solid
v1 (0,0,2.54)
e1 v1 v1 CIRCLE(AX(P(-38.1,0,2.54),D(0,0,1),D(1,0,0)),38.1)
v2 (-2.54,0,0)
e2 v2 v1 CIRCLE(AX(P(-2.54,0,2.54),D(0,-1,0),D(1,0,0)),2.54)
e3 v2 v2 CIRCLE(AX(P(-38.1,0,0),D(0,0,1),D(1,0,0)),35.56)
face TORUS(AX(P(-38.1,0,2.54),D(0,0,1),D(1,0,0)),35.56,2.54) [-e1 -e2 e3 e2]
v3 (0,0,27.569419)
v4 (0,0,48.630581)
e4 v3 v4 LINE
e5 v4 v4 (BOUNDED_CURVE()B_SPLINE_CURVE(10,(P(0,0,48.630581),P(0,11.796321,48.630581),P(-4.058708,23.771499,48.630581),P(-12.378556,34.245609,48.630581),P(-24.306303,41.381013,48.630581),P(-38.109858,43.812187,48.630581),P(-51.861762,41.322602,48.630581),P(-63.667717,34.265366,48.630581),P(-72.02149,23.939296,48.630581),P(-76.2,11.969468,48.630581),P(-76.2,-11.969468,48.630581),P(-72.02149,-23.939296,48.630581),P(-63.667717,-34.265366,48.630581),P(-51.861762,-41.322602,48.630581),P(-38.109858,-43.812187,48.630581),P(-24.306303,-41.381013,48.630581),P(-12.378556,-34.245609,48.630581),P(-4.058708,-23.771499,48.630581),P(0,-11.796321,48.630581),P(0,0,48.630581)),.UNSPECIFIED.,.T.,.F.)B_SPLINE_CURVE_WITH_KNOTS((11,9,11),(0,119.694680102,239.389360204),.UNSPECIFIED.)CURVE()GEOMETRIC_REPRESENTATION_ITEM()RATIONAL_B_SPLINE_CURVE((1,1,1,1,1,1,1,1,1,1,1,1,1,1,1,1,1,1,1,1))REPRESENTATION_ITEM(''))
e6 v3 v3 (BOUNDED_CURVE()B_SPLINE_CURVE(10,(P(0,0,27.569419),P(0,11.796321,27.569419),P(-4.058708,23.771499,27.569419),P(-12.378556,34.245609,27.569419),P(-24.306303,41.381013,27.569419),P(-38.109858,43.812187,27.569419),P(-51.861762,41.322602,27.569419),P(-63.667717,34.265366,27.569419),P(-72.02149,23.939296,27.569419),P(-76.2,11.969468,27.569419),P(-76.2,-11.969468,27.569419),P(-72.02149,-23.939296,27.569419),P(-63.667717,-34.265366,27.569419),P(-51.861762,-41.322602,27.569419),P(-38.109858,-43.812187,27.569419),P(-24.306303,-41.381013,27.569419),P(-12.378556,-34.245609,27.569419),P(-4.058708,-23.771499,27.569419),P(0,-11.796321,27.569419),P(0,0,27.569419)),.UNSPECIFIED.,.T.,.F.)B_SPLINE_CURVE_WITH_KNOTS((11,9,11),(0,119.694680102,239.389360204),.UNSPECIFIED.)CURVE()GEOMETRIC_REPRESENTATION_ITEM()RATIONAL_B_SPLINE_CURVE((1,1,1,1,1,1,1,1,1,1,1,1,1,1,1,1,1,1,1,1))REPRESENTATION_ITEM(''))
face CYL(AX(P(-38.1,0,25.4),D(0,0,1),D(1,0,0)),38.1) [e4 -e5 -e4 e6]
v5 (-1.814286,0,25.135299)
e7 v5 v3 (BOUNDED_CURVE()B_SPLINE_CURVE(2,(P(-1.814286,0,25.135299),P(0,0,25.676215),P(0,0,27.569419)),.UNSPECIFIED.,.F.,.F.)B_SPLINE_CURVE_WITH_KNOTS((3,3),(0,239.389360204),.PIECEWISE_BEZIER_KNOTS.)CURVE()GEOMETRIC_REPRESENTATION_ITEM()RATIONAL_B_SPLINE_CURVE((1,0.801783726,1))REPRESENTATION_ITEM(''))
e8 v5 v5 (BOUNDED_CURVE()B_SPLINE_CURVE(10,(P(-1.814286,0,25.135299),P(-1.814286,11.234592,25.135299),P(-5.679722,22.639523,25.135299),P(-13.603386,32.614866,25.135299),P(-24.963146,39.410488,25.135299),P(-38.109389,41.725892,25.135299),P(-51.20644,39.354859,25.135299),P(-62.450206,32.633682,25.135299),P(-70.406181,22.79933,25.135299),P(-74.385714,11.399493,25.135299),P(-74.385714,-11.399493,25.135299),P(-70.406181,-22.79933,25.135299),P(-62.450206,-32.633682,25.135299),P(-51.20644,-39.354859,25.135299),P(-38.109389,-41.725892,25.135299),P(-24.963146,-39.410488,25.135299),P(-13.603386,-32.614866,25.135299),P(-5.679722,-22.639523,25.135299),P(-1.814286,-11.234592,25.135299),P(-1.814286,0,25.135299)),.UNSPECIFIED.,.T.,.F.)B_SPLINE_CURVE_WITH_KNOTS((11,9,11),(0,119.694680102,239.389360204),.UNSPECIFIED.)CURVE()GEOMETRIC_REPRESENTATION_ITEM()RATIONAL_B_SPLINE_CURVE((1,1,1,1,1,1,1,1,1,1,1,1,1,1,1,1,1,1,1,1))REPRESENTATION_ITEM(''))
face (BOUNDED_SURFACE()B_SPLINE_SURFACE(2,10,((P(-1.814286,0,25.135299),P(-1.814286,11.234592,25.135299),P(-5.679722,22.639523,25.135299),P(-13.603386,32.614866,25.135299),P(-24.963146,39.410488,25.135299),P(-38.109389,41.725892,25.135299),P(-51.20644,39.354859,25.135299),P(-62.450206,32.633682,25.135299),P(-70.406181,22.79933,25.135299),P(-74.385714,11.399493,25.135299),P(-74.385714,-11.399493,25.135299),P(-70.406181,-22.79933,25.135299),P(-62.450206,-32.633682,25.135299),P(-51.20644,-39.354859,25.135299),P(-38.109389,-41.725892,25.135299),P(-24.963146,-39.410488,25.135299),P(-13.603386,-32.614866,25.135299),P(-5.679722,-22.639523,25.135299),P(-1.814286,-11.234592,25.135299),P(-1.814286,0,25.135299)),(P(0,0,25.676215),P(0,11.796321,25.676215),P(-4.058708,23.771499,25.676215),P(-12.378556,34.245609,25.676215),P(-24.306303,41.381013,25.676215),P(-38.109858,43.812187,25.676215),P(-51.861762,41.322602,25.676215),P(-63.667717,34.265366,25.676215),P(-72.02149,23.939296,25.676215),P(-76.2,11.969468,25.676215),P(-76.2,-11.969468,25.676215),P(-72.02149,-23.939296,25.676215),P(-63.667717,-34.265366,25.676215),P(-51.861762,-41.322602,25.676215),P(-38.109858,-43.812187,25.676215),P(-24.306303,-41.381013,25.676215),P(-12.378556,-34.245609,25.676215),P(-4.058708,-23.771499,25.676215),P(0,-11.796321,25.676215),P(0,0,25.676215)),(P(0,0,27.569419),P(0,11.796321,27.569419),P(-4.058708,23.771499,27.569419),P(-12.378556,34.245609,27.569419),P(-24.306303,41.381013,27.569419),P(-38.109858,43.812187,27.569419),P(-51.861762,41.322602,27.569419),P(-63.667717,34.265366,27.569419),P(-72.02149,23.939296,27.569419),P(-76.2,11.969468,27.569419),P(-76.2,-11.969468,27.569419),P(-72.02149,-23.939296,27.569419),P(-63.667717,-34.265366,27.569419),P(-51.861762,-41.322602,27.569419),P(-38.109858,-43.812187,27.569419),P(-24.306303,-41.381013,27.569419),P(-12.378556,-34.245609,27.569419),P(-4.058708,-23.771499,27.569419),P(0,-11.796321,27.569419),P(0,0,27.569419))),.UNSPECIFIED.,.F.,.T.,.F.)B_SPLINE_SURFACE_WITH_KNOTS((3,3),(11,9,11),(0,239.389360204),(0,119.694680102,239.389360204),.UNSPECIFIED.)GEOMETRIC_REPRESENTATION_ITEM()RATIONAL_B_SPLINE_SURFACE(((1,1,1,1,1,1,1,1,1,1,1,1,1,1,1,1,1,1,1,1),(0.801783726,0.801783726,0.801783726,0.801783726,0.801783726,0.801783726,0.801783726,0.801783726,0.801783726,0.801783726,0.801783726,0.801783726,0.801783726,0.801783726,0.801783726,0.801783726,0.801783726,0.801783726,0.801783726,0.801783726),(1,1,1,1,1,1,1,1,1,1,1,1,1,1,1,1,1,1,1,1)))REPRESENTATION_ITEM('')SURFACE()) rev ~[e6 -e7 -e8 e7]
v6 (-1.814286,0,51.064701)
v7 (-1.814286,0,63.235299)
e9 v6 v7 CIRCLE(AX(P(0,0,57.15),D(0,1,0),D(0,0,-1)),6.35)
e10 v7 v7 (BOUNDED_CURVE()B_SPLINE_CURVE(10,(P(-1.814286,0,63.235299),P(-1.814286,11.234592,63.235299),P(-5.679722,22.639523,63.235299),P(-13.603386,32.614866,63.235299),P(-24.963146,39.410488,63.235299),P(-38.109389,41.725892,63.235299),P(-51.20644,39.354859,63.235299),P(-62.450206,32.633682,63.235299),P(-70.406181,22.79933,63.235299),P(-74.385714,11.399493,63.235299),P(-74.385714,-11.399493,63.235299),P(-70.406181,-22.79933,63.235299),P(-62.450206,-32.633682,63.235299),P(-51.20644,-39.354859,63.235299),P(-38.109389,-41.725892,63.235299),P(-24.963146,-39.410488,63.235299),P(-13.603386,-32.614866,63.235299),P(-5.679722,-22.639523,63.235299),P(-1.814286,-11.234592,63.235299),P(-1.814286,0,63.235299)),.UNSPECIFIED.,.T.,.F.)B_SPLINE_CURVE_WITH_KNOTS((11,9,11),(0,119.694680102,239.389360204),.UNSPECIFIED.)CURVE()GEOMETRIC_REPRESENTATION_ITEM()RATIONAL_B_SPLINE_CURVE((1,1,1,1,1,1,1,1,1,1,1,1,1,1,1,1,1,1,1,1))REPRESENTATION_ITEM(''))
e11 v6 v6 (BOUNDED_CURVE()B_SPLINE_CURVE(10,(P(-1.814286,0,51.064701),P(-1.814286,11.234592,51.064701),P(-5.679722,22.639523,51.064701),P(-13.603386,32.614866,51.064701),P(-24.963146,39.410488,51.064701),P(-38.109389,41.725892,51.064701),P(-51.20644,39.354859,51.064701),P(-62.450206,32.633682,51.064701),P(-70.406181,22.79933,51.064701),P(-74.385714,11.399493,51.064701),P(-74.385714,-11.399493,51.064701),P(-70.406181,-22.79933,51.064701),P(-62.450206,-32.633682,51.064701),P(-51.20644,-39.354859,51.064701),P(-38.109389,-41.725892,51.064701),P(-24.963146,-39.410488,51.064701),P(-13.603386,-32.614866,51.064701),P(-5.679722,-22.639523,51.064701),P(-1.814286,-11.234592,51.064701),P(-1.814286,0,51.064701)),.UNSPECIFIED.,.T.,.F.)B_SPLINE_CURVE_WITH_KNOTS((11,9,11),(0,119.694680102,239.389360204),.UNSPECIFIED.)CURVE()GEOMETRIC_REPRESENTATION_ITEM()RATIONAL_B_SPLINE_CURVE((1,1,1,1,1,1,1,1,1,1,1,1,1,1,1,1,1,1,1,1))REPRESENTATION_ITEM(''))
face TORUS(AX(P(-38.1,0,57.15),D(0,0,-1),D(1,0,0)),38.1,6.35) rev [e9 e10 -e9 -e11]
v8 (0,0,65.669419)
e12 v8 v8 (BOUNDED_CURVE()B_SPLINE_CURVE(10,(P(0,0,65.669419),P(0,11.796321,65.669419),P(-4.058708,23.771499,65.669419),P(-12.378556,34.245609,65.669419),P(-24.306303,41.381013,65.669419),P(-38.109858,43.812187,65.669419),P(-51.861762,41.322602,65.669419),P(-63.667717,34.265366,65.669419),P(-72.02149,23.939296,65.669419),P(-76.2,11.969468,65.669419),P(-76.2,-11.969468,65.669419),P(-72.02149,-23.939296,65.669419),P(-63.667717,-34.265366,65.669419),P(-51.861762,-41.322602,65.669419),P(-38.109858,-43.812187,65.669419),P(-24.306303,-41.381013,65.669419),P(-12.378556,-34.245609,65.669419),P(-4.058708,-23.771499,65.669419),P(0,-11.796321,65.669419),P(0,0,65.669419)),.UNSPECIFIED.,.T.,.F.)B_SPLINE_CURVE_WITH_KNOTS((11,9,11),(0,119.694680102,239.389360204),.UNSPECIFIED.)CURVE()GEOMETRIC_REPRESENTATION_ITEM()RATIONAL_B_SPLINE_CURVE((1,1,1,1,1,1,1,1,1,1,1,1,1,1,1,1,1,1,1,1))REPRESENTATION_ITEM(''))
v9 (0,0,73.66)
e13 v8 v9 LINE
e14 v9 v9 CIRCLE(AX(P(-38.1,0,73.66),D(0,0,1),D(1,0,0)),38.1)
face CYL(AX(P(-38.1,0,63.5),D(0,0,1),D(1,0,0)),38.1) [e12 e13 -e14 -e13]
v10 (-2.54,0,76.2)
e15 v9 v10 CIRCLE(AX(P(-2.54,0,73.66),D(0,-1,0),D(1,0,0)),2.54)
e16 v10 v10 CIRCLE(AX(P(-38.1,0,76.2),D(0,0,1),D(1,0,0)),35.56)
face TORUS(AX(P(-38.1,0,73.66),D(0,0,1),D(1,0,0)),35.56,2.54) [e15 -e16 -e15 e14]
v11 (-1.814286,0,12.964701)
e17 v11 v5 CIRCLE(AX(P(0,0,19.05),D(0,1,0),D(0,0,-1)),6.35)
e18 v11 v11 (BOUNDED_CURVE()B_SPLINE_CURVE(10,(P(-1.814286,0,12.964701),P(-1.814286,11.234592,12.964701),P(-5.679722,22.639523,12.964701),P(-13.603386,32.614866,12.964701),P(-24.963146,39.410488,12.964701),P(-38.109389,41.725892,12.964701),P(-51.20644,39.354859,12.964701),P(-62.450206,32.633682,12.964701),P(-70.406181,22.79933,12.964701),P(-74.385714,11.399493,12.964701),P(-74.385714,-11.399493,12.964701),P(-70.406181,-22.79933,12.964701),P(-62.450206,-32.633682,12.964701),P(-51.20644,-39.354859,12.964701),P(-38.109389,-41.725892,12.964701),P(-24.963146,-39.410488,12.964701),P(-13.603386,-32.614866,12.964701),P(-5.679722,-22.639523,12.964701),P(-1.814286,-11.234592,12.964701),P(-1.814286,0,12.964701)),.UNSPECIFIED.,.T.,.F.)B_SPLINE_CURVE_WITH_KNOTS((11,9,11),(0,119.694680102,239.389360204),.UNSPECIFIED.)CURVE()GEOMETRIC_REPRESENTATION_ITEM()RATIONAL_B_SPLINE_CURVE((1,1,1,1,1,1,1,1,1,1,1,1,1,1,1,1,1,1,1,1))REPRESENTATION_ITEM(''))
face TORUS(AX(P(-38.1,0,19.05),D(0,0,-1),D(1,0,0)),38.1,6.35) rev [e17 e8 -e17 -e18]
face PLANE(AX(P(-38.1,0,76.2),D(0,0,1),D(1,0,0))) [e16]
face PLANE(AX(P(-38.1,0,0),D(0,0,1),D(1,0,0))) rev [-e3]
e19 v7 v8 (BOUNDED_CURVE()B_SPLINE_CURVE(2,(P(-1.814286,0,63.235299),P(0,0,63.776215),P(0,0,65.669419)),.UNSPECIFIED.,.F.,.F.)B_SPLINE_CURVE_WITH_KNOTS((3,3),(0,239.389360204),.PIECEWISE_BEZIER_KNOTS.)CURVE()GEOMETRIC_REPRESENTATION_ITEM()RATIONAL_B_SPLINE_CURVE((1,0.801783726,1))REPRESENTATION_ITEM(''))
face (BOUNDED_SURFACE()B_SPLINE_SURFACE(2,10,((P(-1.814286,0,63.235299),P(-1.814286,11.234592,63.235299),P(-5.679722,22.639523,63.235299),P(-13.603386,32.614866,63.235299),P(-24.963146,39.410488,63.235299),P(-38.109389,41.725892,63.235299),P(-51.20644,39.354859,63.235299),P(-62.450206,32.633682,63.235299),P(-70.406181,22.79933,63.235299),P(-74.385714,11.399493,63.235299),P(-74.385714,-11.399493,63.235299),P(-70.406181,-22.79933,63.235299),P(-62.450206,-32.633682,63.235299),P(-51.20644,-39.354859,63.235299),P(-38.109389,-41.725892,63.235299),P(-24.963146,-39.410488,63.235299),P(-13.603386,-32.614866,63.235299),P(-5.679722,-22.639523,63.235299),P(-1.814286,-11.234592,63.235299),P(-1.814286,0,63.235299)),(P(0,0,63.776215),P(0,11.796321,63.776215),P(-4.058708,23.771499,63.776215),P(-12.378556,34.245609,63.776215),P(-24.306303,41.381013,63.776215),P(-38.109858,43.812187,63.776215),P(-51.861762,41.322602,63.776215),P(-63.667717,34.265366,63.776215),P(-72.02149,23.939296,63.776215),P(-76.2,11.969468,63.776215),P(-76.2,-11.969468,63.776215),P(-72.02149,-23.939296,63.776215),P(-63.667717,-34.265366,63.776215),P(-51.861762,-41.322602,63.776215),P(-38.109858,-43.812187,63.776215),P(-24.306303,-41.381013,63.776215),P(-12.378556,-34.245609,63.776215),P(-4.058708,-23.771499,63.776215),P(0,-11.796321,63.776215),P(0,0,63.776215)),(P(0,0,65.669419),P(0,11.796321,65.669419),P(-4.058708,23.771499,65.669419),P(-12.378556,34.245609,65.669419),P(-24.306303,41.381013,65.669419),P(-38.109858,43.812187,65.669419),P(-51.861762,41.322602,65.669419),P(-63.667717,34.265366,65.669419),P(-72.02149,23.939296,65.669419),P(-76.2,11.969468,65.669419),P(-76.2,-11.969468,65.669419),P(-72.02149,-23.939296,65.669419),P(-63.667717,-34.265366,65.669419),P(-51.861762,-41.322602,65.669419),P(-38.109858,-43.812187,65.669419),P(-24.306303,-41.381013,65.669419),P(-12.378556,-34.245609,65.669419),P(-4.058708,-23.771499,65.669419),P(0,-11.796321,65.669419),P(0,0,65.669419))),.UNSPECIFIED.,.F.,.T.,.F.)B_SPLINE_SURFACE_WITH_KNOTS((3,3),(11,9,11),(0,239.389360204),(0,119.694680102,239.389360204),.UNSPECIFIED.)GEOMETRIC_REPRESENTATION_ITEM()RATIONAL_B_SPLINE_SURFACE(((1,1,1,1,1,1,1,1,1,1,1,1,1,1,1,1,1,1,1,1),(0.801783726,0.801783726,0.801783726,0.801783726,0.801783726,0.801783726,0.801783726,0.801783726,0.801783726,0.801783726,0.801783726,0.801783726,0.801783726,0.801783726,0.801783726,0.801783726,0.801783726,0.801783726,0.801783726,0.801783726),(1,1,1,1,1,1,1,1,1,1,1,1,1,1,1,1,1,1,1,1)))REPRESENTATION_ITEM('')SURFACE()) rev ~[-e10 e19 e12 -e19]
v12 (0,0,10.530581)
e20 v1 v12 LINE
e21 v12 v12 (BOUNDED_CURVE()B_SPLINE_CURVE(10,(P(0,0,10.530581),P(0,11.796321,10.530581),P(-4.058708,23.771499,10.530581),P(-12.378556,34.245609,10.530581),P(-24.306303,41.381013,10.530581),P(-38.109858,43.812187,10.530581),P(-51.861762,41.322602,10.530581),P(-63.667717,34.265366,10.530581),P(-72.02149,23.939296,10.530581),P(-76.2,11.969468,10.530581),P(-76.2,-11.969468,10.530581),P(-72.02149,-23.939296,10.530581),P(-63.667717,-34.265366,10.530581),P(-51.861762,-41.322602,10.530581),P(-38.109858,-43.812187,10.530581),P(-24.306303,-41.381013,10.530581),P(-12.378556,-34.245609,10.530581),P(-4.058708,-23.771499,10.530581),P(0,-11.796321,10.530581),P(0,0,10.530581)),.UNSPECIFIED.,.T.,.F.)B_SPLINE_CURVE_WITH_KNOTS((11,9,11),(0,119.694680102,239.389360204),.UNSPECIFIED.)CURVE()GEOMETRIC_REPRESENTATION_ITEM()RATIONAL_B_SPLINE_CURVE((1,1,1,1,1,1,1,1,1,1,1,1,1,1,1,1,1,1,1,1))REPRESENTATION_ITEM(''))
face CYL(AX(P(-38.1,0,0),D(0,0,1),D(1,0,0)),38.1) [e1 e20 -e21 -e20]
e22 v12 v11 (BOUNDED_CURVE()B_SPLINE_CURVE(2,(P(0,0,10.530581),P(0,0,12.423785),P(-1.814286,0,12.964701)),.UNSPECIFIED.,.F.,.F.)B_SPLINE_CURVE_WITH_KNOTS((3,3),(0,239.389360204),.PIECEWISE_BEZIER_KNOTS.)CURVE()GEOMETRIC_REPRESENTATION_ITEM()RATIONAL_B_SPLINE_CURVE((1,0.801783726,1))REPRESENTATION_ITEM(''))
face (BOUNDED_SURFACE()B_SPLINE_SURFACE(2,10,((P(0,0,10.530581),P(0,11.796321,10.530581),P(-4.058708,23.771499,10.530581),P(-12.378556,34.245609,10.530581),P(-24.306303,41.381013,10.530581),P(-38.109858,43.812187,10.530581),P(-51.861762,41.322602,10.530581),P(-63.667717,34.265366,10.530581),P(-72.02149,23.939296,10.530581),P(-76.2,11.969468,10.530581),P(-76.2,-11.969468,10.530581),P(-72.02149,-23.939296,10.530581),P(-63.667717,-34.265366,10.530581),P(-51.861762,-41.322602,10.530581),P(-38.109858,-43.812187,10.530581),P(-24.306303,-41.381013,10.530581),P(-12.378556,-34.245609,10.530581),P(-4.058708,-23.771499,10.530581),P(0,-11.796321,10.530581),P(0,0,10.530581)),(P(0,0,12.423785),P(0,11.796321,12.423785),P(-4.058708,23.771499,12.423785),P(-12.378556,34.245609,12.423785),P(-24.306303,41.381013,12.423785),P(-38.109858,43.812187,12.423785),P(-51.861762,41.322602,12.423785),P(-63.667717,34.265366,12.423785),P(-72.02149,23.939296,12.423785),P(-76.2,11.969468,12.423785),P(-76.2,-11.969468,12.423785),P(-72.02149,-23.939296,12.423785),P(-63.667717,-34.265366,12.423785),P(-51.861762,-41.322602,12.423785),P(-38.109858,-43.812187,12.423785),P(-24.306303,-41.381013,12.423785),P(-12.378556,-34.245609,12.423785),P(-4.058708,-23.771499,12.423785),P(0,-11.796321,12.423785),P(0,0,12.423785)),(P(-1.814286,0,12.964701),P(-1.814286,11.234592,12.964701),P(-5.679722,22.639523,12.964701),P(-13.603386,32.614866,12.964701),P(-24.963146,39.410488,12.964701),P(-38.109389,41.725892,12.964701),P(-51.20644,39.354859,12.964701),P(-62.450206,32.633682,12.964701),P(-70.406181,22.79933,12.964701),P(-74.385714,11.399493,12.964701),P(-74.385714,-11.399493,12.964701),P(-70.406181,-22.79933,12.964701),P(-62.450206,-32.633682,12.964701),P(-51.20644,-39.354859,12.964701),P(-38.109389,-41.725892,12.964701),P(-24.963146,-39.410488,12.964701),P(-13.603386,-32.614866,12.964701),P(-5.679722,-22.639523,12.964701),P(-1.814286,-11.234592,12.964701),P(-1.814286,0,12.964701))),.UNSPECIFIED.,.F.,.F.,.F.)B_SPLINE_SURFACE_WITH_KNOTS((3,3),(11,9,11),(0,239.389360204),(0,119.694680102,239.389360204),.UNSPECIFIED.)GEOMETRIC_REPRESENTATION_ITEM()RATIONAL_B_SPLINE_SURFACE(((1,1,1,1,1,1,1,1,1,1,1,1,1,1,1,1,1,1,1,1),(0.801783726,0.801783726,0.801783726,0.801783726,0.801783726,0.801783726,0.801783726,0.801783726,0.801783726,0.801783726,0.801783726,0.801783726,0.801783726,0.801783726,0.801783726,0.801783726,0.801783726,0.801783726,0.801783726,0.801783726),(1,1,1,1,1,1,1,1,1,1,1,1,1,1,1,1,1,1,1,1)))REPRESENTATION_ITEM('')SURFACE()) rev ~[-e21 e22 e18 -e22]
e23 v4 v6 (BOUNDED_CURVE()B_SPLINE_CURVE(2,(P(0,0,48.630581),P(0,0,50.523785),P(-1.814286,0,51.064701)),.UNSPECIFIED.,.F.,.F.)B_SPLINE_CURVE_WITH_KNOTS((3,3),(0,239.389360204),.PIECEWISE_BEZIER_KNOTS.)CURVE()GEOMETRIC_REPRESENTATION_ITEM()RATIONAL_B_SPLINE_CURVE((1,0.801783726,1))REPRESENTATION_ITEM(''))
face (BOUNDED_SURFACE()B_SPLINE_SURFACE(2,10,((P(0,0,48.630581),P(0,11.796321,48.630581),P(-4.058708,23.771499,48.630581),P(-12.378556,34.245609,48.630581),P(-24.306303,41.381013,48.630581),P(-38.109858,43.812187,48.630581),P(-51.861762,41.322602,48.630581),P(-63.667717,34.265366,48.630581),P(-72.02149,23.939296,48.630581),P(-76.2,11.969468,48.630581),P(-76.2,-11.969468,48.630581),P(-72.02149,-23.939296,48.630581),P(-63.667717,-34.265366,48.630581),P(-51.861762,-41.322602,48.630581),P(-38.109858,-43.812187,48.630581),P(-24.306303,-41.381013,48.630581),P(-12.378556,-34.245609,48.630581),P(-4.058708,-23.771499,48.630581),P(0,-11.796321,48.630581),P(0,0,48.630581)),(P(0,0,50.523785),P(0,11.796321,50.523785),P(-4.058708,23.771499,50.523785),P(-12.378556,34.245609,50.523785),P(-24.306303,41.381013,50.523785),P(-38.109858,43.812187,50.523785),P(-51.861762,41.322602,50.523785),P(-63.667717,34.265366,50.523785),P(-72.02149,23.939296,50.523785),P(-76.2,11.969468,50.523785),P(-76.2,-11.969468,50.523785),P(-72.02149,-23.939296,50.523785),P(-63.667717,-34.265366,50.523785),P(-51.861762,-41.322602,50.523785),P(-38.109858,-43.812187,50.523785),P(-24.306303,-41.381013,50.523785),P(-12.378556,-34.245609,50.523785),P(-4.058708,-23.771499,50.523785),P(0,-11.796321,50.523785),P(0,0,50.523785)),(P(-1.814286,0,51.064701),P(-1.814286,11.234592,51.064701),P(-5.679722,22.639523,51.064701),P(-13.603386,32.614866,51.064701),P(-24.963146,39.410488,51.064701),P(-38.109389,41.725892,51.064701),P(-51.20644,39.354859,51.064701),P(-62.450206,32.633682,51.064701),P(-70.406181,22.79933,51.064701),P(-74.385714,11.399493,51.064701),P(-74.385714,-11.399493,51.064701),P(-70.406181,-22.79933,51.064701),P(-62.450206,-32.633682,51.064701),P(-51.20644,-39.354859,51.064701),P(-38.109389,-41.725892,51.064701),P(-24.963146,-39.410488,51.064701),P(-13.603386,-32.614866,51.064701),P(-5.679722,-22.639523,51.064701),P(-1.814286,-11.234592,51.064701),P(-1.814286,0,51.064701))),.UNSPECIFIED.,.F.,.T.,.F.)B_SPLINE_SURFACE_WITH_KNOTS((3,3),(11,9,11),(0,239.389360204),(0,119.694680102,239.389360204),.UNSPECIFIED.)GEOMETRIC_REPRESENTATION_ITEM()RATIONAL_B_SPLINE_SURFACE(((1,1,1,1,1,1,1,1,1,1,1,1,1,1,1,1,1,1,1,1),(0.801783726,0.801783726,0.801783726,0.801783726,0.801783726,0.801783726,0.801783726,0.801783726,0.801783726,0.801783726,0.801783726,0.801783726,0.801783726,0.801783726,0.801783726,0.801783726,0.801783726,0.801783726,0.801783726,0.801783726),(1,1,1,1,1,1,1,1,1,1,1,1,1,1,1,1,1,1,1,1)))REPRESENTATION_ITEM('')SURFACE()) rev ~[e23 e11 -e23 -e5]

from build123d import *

# Parameters (mm, degrees)
F2_R = 2.54


with BuildPart() as f1:
    # F0 (on Front) → F1 (revolve)
    with BuildSketch(Plane.XZ):
        with BuildLine():
            Line((-38.1, 0), (0, 0))
            Line((0, 0), (0, 12.7))
            ThreePointArc((0, 12.7), (-6.35, 19.05), (0, 25.4))
            Line((0, 25.4), (0, 50.8))
            ThreePointArc((0, 50.8), (-6.35, 57.15), (0, 63.5))
            Line((0, 63.5), (0, 76.2))
            Line((0, 76.2), (-38.1, 76.2))
            Line((-38.1, 76.2), (-38.1, 0))
        make_face()
    revolve(axis=Axis((-38.1, 0, 38.1), (0, 0, 1)))

    # F2
    f2_edges = [f1.edges().sort_by_distance(p)[0] for p in [
        (-76.2, 0, 76.2),
        (-76.2, 0, 63.5),
        (-76.2, 0, 25.4),
        (-76.2, 0, 0),
        (-76.2, 0, 12.7),
        (-76.2, 0, 50.8),
    ]]
    fillet(f2_edges, radius=F2_R)


solid = f1.part
